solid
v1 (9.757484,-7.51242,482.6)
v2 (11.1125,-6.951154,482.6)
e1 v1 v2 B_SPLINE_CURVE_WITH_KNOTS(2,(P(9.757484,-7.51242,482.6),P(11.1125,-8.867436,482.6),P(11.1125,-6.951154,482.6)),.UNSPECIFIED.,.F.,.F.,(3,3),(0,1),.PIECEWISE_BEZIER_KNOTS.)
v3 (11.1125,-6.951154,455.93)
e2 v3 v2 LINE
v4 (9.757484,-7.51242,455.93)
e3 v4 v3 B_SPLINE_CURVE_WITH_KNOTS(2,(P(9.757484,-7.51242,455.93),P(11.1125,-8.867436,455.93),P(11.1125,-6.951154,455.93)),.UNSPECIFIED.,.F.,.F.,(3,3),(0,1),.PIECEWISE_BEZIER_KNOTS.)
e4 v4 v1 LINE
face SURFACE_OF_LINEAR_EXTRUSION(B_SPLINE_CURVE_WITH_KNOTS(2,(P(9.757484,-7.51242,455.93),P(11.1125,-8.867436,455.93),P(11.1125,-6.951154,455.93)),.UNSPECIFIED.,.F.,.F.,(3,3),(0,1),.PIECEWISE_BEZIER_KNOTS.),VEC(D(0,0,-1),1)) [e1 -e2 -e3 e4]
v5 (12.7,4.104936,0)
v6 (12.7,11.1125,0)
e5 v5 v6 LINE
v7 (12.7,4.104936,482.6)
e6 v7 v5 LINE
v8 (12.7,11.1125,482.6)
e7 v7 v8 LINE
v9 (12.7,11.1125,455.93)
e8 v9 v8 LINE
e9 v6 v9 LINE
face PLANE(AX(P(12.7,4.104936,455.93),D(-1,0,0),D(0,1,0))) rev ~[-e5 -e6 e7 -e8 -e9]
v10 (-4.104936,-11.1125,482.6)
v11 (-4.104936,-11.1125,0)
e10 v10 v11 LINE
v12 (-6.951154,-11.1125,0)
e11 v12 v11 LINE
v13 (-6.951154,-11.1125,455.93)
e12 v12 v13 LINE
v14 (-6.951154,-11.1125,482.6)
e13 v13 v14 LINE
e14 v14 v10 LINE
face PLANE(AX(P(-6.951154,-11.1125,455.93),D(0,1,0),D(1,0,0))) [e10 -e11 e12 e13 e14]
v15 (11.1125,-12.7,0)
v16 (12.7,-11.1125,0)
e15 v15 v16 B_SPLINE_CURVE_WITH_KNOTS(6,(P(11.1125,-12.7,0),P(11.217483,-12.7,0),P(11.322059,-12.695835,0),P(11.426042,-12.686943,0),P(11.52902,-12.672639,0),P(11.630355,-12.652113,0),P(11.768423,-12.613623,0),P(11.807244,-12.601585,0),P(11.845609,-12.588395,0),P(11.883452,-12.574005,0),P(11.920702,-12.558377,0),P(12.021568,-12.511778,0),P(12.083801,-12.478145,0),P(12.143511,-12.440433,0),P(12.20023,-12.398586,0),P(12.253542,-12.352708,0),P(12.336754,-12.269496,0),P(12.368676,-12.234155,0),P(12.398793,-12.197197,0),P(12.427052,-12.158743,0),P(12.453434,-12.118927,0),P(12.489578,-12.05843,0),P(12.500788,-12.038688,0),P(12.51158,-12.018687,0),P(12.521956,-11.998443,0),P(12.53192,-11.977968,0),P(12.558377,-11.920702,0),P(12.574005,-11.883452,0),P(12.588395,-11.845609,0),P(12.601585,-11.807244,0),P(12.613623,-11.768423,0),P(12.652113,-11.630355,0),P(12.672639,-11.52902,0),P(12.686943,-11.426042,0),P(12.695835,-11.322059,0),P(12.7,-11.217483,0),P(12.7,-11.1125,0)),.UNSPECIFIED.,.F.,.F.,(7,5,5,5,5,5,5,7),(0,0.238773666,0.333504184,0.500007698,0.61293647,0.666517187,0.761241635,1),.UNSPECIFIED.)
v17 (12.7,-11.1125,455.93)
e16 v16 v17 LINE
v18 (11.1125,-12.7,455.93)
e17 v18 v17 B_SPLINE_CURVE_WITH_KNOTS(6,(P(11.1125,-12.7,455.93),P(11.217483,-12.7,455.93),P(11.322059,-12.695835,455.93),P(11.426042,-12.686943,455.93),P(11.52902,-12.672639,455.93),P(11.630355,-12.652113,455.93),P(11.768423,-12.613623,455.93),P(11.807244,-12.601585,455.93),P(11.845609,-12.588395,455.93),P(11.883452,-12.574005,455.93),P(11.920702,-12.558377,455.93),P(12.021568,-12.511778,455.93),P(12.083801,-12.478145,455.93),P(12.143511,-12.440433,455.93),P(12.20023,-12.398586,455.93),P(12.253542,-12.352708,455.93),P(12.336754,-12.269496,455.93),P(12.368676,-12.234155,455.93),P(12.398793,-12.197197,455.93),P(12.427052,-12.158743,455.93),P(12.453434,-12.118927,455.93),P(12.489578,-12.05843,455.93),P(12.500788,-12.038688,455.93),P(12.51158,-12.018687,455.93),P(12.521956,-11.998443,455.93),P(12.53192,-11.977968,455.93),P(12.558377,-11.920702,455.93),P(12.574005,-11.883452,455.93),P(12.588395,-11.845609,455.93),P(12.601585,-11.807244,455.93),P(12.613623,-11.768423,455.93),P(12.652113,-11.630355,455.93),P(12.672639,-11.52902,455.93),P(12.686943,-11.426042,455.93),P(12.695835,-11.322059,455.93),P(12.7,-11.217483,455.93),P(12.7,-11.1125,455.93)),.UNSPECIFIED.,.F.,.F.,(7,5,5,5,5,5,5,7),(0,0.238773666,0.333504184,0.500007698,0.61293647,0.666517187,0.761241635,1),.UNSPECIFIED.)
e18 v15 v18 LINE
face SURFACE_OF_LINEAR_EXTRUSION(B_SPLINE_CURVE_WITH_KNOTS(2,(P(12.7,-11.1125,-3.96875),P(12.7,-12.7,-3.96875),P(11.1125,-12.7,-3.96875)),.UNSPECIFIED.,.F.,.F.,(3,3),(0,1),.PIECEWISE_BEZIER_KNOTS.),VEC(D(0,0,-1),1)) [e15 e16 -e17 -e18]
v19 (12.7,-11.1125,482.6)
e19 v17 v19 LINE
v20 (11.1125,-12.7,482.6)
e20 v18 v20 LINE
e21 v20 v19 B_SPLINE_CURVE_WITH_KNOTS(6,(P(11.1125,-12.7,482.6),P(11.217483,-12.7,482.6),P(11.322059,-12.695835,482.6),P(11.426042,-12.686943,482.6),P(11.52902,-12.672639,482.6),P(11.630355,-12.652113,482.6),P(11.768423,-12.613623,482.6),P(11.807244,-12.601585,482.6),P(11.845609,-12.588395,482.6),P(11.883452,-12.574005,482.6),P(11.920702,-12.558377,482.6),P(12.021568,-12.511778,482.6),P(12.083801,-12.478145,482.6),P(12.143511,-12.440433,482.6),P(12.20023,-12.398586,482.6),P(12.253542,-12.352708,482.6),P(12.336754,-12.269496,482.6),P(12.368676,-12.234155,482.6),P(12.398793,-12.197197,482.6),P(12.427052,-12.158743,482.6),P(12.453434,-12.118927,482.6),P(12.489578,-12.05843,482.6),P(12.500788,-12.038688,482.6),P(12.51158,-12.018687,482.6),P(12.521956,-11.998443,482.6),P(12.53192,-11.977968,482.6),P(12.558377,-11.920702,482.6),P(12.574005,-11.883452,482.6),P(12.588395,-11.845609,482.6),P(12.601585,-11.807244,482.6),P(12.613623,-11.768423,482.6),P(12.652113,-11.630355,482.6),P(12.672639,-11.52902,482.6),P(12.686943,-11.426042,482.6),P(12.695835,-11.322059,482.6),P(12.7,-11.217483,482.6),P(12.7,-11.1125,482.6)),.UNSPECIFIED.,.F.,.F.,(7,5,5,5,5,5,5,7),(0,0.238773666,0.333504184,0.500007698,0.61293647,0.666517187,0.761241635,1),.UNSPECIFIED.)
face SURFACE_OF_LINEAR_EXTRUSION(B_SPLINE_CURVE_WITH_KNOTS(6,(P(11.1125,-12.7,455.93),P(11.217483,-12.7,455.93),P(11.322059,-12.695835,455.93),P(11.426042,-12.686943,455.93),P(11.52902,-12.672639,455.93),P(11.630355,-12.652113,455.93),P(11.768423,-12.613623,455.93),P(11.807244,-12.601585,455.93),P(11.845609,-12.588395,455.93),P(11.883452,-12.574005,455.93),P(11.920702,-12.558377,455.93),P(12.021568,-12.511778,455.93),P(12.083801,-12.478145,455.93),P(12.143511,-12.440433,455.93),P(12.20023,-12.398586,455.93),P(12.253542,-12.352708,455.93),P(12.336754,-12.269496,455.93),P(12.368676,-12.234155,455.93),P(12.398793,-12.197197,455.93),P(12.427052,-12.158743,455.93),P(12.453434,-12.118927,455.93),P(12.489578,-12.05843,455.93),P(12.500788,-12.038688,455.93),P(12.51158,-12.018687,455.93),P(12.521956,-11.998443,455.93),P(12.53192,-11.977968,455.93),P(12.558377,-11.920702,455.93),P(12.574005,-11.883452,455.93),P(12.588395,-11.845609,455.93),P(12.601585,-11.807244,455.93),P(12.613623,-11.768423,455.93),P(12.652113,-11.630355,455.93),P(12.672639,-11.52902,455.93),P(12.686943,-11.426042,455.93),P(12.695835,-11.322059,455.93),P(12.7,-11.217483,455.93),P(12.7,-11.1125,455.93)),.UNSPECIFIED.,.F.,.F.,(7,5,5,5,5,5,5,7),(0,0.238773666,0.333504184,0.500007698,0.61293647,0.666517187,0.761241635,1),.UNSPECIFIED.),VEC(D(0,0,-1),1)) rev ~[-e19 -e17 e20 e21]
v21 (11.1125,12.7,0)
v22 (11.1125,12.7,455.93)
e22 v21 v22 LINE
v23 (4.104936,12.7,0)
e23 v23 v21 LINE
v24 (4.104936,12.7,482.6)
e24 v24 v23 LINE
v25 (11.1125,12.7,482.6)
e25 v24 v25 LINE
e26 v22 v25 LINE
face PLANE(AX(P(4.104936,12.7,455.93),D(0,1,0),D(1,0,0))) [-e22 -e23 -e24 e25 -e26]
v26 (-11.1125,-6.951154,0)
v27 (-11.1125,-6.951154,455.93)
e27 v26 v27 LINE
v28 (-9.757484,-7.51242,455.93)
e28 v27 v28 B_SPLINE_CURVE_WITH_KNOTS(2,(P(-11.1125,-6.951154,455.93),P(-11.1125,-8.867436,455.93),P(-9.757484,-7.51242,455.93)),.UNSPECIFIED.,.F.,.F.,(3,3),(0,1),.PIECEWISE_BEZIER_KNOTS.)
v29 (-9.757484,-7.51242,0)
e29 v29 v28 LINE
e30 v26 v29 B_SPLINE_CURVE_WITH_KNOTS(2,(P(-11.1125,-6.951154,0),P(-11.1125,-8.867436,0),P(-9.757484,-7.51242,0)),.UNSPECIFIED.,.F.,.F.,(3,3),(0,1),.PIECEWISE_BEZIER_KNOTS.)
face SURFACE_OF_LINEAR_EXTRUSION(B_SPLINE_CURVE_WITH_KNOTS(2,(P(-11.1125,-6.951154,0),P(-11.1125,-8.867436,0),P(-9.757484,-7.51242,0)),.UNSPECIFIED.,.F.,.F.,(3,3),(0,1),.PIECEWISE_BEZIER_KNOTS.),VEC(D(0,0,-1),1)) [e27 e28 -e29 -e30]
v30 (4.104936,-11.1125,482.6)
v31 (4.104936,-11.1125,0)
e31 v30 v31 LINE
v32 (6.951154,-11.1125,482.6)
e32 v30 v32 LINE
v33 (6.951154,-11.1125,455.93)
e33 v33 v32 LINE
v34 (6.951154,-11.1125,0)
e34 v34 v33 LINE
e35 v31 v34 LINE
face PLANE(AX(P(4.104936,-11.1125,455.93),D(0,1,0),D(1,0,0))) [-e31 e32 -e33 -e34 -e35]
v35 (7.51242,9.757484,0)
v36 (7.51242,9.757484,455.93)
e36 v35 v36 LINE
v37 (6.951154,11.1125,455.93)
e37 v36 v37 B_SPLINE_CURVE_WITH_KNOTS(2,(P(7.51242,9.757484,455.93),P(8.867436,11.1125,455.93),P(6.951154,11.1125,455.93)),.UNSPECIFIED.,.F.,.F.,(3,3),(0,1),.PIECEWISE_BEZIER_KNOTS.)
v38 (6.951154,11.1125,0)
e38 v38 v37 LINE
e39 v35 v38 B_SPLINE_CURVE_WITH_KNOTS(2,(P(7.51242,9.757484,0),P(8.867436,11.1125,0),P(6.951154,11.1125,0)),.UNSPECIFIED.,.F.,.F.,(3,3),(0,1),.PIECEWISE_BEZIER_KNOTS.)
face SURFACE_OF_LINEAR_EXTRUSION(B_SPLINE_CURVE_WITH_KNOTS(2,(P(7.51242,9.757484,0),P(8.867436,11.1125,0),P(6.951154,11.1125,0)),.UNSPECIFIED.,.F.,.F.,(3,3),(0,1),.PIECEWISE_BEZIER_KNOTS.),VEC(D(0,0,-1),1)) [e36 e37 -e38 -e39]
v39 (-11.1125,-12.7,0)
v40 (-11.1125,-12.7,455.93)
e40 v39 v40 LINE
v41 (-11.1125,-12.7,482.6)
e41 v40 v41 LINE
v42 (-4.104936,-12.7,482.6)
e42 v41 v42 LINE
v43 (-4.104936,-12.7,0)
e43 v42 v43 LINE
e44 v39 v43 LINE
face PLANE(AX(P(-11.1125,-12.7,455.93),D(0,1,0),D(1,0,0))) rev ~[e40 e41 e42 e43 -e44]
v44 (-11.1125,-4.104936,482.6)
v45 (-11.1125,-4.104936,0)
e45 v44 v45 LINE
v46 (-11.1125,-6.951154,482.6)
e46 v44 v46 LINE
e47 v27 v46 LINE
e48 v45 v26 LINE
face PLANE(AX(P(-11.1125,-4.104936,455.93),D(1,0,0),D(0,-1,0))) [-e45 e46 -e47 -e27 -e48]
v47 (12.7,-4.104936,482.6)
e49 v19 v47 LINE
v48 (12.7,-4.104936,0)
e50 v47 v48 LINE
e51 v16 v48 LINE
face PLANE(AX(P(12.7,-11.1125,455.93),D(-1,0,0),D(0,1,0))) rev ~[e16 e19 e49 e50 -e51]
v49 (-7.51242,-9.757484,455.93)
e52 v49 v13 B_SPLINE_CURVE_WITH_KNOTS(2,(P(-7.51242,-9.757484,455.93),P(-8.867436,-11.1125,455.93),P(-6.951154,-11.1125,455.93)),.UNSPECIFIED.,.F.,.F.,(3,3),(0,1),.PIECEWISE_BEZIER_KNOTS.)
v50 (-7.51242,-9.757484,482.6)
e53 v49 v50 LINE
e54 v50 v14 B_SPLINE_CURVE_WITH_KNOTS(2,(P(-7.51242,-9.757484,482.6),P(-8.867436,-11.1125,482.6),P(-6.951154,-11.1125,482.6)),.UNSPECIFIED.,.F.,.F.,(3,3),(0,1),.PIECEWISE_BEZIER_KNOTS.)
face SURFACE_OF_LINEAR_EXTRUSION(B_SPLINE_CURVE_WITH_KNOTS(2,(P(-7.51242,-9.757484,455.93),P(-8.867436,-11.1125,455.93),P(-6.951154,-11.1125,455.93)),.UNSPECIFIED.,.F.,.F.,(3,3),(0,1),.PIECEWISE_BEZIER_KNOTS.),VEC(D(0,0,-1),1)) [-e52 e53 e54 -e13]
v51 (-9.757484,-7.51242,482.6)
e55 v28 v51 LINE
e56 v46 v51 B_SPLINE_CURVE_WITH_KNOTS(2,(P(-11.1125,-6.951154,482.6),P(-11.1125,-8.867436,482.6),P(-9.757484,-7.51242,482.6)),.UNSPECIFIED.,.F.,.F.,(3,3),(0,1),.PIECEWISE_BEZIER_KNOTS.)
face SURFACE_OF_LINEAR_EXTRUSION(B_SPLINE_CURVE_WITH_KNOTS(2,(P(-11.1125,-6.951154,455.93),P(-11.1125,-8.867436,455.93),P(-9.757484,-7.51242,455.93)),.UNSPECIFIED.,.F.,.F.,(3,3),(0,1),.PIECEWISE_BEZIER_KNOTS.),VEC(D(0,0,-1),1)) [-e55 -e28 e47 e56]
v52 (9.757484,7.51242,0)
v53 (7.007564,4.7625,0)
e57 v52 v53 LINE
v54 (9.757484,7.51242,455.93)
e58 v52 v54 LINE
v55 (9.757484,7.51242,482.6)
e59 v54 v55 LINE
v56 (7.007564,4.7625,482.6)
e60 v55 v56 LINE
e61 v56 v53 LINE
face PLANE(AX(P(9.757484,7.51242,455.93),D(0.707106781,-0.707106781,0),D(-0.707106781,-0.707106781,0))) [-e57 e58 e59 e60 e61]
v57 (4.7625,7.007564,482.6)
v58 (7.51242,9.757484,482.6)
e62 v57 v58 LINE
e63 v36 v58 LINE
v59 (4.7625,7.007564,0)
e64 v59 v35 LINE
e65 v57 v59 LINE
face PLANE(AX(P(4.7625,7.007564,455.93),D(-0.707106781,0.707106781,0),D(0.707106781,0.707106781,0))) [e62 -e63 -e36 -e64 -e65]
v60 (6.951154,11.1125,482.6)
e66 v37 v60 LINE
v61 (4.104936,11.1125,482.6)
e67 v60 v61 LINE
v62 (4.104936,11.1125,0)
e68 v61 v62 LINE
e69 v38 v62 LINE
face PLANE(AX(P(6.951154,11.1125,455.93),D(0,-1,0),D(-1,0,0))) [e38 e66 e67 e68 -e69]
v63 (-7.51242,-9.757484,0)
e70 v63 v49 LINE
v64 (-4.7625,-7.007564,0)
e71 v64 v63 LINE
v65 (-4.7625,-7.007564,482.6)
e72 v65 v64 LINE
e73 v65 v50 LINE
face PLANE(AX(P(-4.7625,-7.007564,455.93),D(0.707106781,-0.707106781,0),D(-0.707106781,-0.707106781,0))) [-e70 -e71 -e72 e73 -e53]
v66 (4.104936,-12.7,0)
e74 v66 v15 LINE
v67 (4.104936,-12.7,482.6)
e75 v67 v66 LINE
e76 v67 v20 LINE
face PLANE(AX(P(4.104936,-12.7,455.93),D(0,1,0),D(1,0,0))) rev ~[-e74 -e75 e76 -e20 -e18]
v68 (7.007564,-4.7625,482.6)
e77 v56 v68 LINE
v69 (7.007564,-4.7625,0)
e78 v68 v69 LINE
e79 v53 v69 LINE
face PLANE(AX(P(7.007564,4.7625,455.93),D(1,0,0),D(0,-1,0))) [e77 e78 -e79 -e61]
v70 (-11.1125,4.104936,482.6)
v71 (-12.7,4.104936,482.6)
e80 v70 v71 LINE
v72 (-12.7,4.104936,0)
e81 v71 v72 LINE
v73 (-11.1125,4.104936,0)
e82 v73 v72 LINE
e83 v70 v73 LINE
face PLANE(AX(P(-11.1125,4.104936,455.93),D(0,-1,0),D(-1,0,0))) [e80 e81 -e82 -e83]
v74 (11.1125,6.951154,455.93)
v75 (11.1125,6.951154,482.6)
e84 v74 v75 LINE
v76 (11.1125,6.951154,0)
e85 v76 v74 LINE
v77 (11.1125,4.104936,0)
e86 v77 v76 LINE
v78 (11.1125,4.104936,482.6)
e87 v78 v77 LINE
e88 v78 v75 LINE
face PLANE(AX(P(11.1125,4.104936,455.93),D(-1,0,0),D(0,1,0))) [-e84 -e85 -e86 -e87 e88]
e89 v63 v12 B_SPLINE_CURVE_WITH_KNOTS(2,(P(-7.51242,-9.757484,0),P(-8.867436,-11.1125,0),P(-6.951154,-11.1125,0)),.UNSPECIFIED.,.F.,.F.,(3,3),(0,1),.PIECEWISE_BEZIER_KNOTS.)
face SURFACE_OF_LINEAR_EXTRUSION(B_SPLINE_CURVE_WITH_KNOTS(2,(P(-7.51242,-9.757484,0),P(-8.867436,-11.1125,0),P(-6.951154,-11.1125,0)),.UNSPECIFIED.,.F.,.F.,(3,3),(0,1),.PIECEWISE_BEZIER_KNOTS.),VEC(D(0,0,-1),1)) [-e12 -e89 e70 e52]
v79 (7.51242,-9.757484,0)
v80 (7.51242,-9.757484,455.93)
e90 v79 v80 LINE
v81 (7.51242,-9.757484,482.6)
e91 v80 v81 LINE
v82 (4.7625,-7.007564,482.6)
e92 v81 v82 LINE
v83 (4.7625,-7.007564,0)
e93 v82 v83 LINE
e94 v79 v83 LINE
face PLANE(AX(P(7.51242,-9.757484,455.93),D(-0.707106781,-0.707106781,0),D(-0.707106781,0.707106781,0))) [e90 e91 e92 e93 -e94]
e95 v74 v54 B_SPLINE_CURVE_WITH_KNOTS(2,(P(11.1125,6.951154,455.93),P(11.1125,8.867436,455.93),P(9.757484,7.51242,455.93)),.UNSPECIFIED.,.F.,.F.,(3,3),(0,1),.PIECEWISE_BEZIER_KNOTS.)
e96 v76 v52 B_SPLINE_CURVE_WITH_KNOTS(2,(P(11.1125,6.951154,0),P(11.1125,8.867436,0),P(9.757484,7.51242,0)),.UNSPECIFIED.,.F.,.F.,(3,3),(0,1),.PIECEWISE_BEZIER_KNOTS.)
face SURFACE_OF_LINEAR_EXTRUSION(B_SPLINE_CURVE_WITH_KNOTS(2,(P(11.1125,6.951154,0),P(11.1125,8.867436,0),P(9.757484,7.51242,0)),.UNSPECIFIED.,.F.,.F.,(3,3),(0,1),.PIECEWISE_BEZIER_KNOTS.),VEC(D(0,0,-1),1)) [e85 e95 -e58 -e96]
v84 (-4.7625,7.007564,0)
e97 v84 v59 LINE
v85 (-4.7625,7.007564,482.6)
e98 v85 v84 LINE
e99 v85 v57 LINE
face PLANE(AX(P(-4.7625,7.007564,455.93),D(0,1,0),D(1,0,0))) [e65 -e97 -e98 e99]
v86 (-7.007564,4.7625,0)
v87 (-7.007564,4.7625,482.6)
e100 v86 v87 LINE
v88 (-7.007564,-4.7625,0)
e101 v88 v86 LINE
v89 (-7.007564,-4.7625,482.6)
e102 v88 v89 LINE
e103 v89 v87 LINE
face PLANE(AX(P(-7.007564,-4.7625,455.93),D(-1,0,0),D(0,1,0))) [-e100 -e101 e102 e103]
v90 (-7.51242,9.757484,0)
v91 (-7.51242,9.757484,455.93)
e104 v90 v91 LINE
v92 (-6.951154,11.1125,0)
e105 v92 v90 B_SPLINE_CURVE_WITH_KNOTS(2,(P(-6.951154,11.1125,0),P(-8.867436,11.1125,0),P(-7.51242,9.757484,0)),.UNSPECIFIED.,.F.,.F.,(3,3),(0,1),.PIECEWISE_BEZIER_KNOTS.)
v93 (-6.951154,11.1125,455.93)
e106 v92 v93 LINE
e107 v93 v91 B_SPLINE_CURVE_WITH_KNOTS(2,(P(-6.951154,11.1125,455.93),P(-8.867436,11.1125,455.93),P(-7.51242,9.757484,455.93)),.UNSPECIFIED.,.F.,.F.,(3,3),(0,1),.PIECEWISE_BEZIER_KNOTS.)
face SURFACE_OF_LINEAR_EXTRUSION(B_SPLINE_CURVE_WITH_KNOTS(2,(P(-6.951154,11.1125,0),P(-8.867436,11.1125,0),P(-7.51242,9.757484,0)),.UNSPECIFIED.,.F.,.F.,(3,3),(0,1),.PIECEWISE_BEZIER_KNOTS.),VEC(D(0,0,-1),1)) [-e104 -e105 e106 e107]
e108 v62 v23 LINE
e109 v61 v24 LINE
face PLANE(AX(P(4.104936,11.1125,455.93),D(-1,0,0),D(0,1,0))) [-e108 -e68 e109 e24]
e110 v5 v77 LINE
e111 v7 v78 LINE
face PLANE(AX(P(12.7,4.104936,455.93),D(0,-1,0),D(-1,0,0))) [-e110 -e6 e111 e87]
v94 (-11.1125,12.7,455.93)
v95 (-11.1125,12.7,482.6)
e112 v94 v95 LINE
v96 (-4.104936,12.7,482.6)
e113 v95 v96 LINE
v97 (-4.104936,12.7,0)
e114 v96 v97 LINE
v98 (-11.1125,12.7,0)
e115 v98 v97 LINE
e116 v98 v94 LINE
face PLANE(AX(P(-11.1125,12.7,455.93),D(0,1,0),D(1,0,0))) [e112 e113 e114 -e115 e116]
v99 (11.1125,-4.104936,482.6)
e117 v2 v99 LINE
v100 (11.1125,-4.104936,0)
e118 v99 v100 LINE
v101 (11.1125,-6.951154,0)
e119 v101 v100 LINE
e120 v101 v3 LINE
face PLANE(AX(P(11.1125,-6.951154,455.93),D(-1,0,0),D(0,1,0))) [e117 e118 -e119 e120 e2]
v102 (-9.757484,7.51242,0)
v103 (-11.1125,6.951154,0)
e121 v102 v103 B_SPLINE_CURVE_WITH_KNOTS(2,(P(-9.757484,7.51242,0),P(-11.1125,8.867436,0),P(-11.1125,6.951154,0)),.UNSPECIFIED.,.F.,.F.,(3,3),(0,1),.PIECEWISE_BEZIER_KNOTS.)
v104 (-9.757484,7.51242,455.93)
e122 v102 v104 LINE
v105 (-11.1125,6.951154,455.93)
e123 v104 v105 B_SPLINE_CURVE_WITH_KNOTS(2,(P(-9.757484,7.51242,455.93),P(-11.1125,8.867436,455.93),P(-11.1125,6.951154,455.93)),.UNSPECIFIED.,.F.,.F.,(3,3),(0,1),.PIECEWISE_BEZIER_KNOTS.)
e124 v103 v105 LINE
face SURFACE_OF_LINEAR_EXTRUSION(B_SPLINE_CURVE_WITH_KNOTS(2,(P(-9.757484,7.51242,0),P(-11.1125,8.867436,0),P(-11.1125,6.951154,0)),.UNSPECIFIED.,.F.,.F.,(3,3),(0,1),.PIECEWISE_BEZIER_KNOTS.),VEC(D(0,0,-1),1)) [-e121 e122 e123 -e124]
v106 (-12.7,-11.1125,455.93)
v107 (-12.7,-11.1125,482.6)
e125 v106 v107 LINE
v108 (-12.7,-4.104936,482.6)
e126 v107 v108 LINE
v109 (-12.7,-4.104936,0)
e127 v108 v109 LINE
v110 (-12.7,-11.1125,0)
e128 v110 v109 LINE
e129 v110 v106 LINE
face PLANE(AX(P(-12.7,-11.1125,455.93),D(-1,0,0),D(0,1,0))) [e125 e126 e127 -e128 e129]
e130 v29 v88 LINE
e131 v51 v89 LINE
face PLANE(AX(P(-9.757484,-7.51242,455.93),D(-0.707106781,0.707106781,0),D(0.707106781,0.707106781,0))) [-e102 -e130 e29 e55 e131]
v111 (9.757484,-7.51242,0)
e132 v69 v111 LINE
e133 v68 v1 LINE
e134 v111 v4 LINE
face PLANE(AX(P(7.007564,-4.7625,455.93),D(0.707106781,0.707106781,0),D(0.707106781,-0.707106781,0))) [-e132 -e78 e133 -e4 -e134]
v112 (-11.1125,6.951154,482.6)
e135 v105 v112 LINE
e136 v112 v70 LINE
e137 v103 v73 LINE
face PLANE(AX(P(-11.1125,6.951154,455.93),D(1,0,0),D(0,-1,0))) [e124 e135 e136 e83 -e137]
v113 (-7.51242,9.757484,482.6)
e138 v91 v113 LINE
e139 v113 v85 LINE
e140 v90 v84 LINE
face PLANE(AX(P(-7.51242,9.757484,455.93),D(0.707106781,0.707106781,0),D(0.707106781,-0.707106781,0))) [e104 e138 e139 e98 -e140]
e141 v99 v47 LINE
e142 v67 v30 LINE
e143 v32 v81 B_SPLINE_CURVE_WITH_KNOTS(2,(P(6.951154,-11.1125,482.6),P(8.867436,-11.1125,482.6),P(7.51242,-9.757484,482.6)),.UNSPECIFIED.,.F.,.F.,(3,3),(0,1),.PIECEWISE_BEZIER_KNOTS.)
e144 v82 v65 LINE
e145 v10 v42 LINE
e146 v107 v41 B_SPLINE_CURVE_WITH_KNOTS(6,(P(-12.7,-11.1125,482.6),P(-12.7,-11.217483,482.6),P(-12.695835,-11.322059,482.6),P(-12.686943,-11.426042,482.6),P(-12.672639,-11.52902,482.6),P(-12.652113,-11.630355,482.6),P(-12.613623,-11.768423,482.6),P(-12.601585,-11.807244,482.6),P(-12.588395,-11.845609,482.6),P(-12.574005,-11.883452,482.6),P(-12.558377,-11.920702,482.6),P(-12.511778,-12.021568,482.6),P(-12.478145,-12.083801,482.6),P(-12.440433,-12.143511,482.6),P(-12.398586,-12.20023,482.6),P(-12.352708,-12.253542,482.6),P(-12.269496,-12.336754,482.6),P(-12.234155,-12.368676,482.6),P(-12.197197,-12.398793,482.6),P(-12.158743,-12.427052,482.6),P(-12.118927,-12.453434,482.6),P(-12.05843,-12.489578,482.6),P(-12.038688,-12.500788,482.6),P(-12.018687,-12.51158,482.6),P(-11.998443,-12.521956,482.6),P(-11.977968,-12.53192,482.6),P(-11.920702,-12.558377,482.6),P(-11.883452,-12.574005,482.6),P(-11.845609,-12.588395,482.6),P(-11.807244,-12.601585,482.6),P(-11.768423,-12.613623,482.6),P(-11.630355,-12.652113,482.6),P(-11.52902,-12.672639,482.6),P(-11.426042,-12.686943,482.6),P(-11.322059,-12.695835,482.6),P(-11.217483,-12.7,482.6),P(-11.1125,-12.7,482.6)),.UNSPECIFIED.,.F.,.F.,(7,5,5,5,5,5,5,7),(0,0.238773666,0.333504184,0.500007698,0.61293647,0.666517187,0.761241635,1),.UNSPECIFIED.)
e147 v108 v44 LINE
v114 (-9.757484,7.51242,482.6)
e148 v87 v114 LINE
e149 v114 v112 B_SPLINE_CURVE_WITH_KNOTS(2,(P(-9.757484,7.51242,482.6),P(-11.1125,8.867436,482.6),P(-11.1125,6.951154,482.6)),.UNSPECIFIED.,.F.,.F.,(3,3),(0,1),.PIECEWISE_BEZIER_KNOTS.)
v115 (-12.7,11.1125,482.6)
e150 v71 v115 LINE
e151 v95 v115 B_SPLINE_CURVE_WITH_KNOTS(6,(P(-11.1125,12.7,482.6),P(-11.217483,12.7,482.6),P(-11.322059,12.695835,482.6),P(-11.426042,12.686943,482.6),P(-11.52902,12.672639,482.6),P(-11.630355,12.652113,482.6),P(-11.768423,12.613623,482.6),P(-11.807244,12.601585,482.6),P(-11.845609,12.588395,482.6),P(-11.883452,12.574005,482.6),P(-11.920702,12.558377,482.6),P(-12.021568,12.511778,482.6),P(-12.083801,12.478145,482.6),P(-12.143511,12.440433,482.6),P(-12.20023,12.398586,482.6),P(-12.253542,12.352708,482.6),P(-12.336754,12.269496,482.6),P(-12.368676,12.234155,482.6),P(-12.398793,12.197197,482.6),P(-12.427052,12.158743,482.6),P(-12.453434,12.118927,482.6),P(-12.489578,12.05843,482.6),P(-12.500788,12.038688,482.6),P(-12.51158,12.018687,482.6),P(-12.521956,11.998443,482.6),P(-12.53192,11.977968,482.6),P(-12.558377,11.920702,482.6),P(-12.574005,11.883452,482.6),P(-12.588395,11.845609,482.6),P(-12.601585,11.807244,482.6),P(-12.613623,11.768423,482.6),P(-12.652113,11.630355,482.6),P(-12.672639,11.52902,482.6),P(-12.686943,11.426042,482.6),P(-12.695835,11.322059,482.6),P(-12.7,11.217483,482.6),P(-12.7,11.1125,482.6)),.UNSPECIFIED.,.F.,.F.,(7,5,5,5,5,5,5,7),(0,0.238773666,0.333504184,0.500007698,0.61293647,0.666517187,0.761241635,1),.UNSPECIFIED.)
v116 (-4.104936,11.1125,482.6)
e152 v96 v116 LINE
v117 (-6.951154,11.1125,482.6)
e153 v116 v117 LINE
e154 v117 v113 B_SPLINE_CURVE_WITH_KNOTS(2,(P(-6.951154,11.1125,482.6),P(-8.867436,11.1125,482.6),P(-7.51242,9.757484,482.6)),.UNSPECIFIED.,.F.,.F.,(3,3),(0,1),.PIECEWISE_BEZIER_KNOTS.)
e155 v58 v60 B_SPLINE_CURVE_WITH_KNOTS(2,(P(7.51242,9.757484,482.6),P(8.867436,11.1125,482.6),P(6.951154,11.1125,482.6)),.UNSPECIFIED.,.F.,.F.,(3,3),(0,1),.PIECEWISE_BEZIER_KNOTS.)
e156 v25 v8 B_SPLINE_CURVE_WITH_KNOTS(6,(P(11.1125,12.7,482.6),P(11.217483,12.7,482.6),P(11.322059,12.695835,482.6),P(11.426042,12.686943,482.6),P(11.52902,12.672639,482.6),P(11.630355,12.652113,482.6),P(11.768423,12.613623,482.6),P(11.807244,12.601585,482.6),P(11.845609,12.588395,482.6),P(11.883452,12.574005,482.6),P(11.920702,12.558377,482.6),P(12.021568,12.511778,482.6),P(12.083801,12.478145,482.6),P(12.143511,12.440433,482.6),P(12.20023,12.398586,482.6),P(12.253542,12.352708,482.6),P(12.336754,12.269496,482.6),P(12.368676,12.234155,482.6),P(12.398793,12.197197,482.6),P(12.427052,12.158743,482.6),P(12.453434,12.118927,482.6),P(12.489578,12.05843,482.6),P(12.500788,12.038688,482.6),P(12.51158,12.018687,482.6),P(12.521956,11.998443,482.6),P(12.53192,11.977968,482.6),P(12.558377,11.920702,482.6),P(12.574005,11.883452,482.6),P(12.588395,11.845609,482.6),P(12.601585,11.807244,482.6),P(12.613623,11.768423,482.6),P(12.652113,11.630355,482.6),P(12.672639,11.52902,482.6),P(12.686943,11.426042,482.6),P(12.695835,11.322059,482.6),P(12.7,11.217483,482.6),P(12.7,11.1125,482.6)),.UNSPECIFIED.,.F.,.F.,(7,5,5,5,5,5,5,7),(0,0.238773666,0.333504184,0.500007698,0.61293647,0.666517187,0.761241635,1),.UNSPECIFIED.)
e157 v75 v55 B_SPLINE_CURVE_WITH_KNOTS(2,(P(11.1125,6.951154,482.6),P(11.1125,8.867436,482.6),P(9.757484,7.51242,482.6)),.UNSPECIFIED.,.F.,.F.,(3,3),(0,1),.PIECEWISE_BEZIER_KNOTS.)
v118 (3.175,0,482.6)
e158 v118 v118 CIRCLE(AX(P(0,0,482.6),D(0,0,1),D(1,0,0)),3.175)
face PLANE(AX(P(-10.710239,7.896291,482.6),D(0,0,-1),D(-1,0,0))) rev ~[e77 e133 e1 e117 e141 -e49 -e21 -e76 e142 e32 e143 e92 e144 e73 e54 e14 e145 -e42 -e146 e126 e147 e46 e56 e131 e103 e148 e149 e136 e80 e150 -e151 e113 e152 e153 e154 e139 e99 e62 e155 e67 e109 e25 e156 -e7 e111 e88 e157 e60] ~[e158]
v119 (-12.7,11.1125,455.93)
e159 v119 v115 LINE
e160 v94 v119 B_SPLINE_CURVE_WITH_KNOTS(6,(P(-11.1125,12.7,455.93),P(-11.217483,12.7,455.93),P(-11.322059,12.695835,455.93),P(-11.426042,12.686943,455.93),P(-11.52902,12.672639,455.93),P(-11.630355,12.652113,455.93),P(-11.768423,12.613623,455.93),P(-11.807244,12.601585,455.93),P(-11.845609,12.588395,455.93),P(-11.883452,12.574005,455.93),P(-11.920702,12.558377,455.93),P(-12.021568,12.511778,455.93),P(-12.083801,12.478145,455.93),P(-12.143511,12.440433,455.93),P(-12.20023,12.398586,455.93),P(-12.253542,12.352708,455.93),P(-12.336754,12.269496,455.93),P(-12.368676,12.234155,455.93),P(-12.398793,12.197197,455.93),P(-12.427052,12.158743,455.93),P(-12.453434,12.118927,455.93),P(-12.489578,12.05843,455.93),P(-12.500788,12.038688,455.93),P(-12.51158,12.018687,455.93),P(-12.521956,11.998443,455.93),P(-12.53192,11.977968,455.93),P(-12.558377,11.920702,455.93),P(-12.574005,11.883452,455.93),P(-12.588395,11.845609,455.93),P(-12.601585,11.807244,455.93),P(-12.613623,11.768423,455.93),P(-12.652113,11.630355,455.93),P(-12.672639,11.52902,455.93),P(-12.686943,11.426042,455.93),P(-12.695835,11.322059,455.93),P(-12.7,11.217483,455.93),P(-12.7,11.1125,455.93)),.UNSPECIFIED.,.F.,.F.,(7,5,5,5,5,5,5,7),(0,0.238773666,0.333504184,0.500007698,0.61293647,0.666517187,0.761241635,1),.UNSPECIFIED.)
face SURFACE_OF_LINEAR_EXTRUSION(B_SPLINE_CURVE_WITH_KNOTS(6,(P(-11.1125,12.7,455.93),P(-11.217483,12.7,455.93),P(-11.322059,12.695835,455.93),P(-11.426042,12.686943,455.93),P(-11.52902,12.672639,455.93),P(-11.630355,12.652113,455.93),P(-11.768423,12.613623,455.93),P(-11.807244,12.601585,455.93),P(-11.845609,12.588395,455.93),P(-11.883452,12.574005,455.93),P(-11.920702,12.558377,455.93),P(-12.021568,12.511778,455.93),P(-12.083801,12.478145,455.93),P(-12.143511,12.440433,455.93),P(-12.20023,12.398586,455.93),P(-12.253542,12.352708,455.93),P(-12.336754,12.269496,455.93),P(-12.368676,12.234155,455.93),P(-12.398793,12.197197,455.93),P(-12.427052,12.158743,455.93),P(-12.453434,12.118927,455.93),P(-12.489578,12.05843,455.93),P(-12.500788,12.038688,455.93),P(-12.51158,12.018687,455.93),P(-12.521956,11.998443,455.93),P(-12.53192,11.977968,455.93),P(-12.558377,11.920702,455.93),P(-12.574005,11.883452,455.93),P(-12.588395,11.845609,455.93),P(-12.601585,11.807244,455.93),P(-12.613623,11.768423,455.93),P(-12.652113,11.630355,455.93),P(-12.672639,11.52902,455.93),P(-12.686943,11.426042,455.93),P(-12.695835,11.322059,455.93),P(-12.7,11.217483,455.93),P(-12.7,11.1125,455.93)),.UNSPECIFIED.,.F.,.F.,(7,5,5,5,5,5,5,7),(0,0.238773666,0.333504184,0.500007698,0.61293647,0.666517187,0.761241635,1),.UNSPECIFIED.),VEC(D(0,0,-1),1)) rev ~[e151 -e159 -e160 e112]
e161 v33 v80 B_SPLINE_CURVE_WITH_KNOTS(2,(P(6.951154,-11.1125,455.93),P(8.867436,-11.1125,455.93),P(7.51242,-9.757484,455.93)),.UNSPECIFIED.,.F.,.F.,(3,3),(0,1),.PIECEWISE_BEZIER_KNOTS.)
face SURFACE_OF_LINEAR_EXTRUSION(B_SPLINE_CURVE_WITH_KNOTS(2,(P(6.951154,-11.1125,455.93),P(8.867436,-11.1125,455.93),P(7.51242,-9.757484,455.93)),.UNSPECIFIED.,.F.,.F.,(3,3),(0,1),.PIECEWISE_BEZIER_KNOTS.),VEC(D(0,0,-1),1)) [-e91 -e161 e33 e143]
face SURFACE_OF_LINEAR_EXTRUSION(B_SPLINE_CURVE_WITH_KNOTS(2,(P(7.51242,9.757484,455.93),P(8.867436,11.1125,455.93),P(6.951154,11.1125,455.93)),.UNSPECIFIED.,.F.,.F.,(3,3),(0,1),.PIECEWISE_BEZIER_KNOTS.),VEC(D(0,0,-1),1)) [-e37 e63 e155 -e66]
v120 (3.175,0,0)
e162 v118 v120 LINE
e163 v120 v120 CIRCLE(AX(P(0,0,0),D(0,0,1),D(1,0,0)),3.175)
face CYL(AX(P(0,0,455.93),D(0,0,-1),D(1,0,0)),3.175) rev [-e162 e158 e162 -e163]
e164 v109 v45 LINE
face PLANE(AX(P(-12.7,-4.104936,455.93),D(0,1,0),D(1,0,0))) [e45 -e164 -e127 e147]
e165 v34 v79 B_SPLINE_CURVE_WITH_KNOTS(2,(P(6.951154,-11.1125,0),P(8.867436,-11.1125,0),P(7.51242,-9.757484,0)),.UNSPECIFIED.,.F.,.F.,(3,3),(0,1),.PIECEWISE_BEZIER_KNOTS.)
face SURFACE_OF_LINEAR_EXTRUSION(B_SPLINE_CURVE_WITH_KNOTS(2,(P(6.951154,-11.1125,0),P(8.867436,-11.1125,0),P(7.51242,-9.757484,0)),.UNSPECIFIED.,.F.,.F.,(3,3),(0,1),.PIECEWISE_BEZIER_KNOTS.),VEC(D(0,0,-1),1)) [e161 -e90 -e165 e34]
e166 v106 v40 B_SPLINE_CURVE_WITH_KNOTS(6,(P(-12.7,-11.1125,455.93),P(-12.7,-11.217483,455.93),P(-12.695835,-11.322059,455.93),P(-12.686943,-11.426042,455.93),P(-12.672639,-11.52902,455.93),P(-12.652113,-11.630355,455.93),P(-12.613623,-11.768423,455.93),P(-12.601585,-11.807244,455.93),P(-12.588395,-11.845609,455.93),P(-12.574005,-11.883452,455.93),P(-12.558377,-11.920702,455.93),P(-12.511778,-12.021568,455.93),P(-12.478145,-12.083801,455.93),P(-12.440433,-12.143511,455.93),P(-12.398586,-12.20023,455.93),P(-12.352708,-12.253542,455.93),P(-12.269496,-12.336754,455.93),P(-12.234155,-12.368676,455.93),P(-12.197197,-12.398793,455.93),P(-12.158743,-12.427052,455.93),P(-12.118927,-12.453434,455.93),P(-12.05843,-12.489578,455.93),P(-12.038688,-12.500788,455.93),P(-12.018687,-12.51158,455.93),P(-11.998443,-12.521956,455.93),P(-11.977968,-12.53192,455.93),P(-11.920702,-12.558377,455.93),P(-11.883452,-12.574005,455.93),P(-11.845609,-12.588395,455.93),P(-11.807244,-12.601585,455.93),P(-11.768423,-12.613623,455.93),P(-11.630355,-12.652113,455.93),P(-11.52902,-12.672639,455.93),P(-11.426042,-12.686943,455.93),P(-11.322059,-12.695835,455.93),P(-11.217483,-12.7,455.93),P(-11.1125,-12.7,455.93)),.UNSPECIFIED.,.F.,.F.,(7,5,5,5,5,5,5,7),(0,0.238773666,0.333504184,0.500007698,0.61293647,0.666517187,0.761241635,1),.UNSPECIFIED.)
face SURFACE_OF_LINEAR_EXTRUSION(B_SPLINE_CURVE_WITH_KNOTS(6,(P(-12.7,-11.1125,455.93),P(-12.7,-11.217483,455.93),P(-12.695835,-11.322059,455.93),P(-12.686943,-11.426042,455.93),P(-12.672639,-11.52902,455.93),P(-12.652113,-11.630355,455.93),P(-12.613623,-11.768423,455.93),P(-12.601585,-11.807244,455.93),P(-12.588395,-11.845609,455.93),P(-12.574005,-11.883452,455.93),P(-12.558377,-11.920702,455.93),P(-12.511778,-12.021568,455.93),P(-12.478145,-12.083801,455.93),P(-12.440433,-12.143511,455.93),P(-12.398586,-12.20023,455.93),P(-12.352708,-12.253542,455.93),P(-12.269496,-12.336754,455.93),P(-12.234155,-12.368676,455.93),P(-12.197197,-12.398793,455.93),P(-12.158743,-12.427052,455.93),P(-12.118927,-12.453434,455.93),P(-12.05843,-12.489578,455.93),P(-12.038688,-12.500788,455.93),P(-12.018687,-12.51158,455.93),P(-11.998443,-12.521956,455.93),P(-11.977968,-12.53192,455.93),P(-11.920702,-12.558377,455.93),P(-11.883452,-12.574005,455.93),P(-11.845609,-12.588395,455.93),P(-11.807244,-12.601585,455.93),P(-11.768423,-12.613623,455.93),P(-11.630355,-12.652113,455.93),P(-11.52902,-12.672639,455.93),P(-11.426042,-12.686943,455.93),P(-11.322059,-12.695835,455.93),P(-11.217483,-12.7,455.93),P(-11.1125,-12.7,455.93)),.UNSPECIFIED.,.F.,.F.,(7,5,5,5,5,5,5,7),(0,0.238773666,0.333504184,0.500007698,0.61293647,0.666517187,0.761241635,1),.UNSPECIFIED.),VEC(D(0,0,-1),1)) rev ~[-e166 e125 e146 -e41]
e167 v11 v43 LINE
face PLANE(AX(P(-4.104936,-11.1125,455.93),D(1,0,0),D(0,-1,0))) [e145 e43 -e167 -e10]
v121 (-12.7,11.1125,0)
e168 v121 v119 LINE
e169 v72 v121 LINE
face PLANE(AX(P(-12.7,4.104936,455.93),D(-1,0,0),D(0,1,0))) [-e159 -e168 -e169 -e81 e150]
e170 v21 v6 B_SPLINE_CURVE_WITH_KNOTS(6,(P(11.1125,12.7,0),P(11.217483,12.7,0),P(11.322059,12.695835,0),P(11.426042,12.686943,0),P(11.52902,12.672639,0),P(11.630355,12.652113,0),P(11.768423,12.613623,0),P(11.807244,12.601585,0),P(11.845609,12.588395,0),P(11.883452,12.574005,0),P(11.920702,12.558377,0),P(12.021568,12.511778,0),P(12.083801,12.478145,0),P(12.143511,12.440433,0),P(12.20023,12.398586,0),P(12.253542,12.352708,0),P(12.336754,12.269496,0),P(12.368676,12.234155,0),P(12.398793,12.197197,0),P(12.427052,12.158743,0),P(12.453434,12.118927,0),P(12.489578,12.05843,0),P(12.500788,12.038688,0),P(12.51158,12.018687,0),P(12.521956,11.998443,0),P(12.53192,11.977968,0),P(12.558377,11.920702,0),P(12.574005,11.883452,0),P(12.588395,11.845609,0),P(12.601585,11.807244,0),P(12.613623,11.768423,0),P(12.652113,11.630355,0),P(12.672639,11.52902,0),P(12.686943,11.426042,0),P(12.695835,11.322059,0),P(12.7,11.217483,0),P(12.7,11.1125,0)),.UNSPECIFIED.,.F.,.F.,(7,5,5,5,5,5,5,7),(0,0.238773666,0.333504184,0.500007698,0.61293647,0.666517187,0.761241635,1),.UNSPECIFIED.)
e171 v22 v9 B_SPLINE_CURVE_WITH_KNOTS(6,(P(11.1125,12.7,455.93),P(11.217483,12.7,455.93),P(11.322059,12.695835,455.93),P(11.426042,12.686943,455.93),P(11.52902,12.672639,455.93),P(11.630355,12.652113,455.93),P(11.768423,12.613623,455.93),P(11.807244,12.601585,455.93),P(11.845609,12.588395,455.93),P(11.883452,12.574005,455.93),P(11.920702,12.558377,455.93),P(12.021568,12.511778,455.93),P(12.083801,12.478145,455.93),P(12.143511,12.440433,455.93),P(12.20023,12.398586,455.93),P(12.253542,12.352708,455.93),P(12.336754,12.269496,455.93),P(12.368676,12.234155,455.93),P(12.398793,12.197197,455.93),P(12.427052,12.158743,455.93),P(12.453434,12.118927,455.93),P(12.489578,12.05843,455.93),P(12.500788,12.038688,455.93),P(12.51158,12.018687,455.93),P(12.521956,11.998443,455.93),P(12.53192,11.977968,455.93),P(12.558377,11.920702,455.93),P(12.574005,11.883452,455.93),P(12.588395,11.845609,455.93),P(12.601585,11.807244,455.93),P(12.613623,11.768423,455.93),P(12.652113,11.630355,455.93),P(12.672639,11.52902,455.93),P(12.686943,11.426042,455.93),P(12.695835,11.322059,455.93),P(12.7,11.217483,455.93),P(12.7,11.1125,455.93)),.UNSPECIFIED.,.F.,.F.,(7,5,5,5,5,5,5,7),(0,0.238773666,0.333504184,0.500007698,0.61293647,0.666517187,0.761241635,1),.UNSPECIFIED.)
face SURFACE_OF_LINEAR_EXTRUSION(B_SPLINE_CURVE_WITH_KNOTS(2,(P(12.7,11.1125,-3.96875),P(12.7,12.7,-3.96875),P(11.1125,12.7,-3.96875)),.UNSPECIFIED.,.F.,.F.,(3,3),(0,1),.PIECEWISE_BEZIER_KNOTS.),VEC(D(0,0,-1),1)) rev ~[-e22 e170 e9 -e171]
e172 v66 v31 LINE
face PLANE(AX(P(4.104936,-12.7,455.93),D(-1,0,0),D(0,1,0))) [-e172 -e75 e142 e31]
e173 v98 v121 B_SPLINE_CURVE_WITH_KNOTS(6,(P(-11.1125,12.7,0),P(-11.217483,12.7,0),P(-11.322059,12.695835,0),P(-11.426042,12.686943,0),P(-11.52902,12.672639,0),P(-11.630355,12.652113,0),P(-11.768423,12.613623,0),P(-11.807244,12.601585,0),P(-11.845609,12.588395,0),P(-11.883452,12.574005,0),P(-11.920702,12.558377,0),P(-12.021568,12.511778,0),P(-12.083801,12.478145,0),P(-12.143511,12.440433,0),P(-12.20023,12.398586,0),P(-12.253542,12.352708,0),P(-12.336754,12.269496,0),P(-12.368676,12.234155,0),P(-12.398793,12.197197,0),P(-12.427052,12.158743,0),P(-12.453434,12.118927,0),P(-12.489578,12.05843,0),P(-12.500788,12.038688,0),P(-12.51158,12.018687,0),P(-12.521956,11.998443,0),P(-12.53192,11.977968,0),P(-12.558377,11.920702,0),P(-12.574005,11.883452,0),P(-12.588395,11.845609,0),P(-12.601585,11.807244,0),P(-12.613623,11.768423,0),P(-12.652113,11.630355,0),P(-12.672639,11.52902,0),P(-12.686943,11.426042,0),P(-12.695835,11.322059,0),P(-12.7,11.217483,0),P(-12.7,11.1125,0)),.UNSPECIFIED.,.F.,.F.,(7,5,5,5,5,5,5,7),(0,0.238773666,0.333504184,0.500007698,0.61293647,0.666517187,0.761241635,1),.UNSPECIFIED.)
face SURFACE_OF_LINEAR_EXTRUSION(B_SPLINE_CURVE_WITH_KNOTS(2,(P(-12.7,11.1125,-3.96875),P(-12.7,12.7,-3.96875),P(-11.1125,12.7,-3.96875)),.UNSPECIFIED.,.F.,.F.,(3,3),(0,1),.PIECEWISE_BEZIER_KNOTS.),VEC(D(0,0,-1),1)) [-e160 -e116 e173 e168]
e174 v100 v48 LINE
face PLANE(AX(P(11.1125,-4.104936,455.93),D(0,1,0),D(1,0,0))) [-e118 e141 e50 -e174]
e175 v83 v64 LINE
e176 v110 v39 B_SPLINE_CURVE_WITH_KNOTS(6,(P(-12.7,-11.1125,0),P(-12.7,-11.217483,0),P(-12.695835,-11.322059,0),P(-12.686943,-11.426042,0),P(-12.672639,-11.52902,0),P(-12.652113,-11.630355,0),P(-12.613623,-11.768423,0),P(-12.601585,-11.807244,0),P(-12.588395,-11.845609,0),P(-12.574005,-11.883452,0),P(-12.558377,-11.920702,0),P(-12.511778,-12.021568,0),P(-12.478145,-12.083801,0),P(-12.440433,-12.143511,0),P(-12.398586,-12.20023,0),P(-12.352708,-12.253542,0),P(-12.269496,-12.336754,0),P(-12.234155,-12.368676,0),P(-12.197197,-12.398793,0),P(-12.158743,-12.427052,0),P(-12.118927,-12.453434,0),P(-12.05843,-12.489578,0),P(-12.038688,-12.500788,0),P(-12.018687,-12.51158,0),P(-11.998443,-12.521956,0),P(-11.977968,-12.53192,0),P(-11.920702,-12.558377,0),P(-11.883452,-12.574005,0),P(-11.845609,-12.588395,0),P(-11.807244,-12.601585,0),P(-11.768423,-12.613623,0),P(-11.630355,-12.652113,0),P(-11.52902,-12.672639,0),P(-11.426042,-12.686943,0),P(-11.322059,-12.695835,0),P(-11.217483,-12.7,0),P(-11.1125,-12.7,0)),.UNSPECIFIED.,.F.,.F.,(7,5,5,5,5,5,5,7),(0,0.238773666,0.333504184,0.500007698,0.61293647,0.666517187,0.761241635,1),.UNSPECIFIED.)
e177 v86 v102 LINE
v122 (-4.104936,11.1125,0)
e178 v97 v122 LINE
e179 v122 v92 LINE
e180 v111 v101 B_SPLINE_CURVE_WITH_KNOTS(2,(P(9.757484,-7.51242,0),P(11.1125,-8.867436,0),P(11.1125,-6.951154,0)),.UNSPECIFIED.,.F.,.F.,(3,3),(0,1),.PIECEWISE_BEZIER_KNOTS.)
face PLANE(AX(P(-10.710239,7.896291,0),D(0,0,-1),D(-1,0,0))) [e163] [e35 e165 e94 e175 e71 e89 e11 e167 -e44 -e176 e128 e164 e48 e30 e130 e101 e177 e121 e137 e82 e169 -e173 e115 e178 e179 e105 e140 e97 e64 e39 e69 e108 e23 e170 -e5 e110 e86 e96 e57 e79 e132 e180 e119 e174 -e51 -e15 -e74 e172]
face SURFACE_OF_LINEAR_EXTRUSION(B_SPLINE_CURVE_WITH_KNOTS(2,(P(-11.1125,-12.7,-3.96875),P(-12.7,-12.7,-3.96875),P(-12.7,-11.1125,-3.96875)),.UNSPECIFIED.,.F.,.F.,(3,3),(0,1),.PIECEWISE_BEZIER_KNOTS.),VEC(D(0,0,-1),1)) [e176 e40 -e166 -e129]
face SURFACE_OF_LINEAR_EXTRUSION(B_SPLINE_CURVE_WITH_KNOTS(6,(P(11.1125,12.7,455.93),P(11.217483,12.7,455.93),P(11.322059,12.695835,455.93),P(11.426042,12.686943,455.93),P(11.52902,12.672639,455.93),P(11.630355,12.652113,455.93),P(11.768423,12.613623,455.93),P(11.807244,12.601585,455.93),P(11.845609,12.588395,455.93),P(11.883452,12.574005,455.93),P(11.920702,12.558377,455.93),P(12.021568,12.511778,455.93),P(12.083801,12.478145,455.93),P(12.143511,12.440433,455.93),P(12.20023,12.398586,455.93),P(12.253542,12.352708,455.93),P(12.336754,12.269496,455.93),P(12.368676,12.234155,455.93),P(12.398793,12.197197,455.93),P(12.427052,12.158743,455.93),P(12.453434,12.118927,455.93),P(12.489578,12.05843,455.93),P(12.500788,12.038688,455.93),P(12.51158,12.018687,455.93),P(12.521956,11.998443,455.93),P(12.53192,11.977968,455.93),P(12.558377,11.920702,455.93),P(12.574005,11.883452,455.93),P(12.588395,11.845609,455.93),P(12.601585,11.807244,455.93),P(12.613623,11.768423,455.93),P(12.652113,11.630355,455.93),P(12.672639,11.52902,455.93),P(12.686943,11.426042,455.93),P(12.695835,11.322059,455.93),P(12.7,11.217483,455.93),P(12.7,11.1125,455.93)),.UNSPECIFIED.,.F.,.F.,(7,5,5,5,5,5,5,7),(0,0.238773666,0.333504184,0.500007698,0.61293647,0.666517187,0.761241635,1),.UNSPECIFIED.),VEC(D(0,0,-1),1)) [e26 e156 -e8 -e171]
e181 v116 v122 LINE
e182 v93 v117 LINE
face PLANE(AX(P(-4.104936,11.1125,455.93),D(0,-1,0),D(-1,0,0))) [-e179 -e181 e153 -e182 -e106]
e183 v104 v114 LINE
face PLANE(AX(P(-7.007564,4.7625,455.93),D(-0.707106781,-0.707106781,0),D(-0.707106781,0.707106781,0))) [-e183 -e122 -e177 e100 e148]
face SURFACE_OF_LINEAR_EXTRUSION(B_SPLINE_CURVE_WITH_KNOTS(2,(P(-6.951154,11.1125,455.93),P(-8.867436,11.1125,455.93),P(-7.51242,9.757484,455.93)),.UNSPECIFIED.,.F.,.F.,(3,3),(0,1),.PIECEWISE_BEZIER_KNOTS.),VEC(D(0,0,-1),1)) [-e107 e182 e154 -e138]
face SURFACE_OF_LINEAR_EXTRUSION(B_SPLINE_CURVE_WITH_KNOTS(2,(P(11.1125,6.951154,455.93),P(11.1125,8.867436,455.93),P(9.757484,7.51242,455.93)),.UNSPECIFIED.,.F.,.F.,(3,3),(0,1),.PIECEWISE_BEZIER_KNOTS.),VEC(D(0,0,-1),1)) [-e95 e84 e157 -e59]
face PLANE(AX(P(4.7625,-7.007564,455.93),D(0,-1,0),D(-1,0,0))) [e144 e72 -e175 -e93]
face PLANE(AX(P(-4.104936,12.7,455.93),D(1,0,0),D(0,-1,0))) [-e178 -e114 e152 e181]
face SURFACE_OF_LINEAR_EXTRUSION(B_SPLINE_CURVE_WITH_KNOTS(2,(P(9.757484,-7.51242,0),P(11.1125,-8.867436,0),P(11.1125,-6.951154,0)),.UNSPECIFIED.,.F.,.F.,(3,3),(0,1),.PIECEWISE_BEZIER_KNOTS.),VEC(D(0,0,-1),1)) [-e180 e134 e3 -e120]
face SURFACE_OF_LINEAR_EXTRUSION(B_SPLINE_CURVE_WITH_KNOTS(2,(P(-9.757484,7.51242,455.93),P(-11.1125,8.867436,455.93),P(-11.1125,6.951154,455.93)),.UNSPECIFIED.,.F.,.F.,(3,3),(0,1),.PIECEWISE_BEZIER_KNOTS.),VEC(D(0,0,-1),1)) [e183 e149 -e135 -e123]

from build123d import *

# Parameters (mm, degrees)
F0_W        = 25.4
F0_H        = 25.4
F1_DEPTH    = 455.93
F3_DEPTH    = 455.93
F4_R        = 3.175
F5_DEPTH    = 455.93
F6_T1_DEPTH = 463.8675
F7_T1_DEPTH = 455.93
F8_DEPTH    = 26.67


# Not quite as in the source:
# - a fillet or chamfer that OpenCascade refuses, or shapes differently, is made with other operations: its cross-section is extruded or revolved along the edge and cut away or added


with BuildPart() as f1:
    # F0 (on Top) → F1 (new body)
    with BuildSketch(Plane.XY):
        Rectangle(F0_W, F0_H)
    extrude(amount=F1_DEPTH)

    # F2 (on face) → F3 (cut)
    with BuildSketch(Plane.XY.offset(455.93)):
        Polygon((-7.0075640303, -4.7625), (-7.0075640303, 4.7625), (-11.1125, 8.8674359697), (-11.1125, 4.1049359697), (-12.7, 4.1049359697), (-12.7, -4.1049359697), (-11.1125, -4.1049359697), (-11.1125, -8.8674359697), align=None)
        Polygon((4.1049359697, 12.7), (-4.1049359697, 12.7), (-4.1049359697, 11.1125), (-8.8674359697, 11.1125), (-4.7625, 7.0075640303), (4.7625, 7.0075640303), (8.8674359697, 11.1125), (4.1049359697, 11.1125), align=None)
        Polygon((12.7, -4.1049359697), (12.7, 4.1049359697), (11.1125, 4.1049359697), (11.1125, 8.8674359697), (7.0075640303, 4.7625), (7.0075640303, -4.7625), (11.1125, -8.8674359697), (11.1125, -4.1049359697), align=None)
        Polygon((-4.1049359697, -11.1125), (-4.1049359697, -12.7), (4.1049359697, -12.7), (4.1049359697, -11.1125), (8.8674359697, -11.1125), (4.7625, -7.0075640303), (-4.7625, -7.0075640303), (-8.8674359697, -11.1125), align=None)
    extrude(amount=-F3_DEPTH, mode=Mode.SUBTRACT)

    # F4 (on face) → F5 (cut)
    with BuildSketch(Plane.XY.offset(455.93)):
        Circle(F4_R)
    extrude(amount=-F5_DEPTH, mode=Mode.SUBTRACT)

    # F6: fillet of radius 1.5875 on 4 edges, made by hand

    # F6_s2 → F6_t1 (cut)
    with BuildSketch(Plane.XY.offset(-3.96875)):
        with BuildLine():
            add(Edge.make_bspline(
                [(-12.7, 11.1125), (-12.7, 12.7), (-11.1125, 12.7)],
                knots=[0, 0, 0, 1, 1, 1], degree=2, weights=[1, 1, 1]))
            Line((-11.1125, 12.7), (-12.7, 12.7))
            Line((-12.7, 12.7), (-12.7, 11.1125))
        make_face()
        with BuildLine():
            add(Edge.make_bspline(
                [(12.7, 11.1125), (12.7, 12.7), (11.1125, 12.7)],
                knots=[0, 0, 0, 1, 1, 1], degree=2, weights=[1, 1, 1]))
            Line((11.1125, 12.7), (12.7, 12.7))
            Line((12.7, 12.7), (12.7, 11.1125))
        make_face()
        with BuildLine():
            add(Edge.make_bspline(
                [(12.7, -11.1125), (12.7, -12.7), (11.1125, -12.7)],
                knots=[0, 0, 0, 1, 1, 1], degree=2, weights=[1, 1, 1]))
            Line((11.1125, -12.7), (12.7, -12.7))
            Line((12.7, -12.7), (12.7, -11.1125))
        make_face()
        with BuildLine():
            add(Edge.make_bspline(
                [(-11.1125, -12.7), (-12.7, -12.7), (-12.7, -11.1125)],
                knots=[0, 0, 0, 1, 1, 1], degree=2, weights=[1, 1, 1]))
            Line((-12.7, -11.1125), (-12.7, -12.7))
            Line((-12.7, -12.7), (-11.1125, -12.7))
        make_face()
    extrude(amount=F6_T1_DEPTH, mode=Mode.SUBTRACT)

    # F7: fillet of radius 0.79375 on 8 edges, made by hand

    # F7_s2 → F7_t1 (join)
    with BuildSketch(Plane.XY):
        with BuildLine():
            add(Edge.make_bspline(
                [(-9.7574839924, 7.5124199622), (-11.1125, 8.8674359697), (-11.1125, 6.9511539546)],
                knots=[0, 0, 0, 1, 1, 1], degree=2, weights=[1, 1, 1]))
            Line((-11.1125, 6.9511539546), (-11.1125, 8.8674359697))
            Line((-11.1125, 8.8674359697), (-9.7574839924, 7.5124199622))
        make_face()
        with BuildLine():
            add(Edge.make_bspline(
                [(11.1125, 6.9511539546), (11.1125, 8.8674359697), (9.7574839924, 7.5124199622)],
                knots=[0, 0, 0, 1, 1, 1], degree=2, weights=[1, 1, 1]))
            Line((9.7574839924, 7.5124199622), (11.1125, 8.8674359697))
            Line((11.1125, 8.8674359697), (11.1125, 6.9511539546))
        make_face()
        with BuildLine():
            add(Edge.make_bspline(
                [(9.7574839924, -7.5124199622), (11.1125, -8.8674359697), (11.1125, -6.9511539546)],
                knots=[0, 0, 0, 1, 1, 1], degree=2, weights=[1, 1, 1]))
            Line((11.1125, -6.9511539546), (11.1125, -8.8674359697))
            Line((11.1125, -8.8674359697), (9.7574839924, -7.5124199622))
        make_face()
        with BuildLine():
            add(Edge.make_bspline(
                [(-11.1125, -6.9511539546), (-11.1125, -8.8674359697), (-9.7574839924, -7.5124199622)],
                knots=[0, 0, 0, 1, 1, 1], degree=2, weights=[1, 1, 1]))
            Line((-9.7574839924, -7.5124199622), (-11.1125, -8.8674359697))
            Line((-11.1125, -8.8674359697), (-11.1125, -6.9511539546))
        make_face()
        with BuildLine():
            add(Edge.make_bspline(
                [(-7.5124199622, -9.7574839924), (-8.8674359697, -11.1125), (-6.9511539546, -11.1125)],
                knots=[0, 0, 0, 1, 1, 1], degree=2, weights=[1, 1, 1]))
            Line((-6.9511539546, -11.1125), (-8.8674359697, -11.1125))
            Line((-8.8674359697, -11.1125), (-7.5124199622, -9.7574839924))
        make_face()
        with BuildLine():
            add(Edge.make_bspline(
                [(6.9511539546, -11.1125), (8.8674359697, -11.1125), (7.5124199622, -9.7574839924)],
                knots=[0, 0, 0, 1, 1, 1], degree=2, weights=[1, 1, 1]))
            Line((7.5124199622, -9.7574839924), (8.8674359697, -11.1125))
            Line((8.8674359697, -11.1125), (6.9511539546, -11.1125))
        make_face()
        with BuildLine():
            add(Edge.make_bspline(
                [(7.5124199622, 9.7574839924), (8.8674359697, 11.1125), (6.9511539546, 11.1125)],
                knots=[0, 0, 0, 1, 1, 1], degree=2, weights=[1, 1, 1]))
            Line((6.9511539546, 11.1125), (8.8674359697, 11.1125))
            Line((8.8674359697, 11.1125), (7.5124199622, 9.7574839924))
        make_face()
        with BuildLine():
            add(Edge.make_bspline(
                [(-6.9511539546, 11.1125), (-8.8674359697, 11.1125), (-7.5124199622, 9.7574839924)],
                knots=[0, 0, 0, 1, 1, 1], degree=2, weights=[1, 1, 1]))
            Line((-7.5124199622, 9.7574839924), (-8.8674359697, 11.1125))
            Line((-8.8674359697, 11.1125), (-6.9511539546, 11.1125))
        make_face()
    extrude(amount=F7_T1_DEPTH)

    # F8 (add): a face of the model
    f8_faces = [f1.faces().sort_by_distance(p)[0] for p in [
        (4.4641462174, -11.90625, 455.93),
    ]]
    extrude(f8_faces, amount=F8_DEPTH)


solid = f1.part
